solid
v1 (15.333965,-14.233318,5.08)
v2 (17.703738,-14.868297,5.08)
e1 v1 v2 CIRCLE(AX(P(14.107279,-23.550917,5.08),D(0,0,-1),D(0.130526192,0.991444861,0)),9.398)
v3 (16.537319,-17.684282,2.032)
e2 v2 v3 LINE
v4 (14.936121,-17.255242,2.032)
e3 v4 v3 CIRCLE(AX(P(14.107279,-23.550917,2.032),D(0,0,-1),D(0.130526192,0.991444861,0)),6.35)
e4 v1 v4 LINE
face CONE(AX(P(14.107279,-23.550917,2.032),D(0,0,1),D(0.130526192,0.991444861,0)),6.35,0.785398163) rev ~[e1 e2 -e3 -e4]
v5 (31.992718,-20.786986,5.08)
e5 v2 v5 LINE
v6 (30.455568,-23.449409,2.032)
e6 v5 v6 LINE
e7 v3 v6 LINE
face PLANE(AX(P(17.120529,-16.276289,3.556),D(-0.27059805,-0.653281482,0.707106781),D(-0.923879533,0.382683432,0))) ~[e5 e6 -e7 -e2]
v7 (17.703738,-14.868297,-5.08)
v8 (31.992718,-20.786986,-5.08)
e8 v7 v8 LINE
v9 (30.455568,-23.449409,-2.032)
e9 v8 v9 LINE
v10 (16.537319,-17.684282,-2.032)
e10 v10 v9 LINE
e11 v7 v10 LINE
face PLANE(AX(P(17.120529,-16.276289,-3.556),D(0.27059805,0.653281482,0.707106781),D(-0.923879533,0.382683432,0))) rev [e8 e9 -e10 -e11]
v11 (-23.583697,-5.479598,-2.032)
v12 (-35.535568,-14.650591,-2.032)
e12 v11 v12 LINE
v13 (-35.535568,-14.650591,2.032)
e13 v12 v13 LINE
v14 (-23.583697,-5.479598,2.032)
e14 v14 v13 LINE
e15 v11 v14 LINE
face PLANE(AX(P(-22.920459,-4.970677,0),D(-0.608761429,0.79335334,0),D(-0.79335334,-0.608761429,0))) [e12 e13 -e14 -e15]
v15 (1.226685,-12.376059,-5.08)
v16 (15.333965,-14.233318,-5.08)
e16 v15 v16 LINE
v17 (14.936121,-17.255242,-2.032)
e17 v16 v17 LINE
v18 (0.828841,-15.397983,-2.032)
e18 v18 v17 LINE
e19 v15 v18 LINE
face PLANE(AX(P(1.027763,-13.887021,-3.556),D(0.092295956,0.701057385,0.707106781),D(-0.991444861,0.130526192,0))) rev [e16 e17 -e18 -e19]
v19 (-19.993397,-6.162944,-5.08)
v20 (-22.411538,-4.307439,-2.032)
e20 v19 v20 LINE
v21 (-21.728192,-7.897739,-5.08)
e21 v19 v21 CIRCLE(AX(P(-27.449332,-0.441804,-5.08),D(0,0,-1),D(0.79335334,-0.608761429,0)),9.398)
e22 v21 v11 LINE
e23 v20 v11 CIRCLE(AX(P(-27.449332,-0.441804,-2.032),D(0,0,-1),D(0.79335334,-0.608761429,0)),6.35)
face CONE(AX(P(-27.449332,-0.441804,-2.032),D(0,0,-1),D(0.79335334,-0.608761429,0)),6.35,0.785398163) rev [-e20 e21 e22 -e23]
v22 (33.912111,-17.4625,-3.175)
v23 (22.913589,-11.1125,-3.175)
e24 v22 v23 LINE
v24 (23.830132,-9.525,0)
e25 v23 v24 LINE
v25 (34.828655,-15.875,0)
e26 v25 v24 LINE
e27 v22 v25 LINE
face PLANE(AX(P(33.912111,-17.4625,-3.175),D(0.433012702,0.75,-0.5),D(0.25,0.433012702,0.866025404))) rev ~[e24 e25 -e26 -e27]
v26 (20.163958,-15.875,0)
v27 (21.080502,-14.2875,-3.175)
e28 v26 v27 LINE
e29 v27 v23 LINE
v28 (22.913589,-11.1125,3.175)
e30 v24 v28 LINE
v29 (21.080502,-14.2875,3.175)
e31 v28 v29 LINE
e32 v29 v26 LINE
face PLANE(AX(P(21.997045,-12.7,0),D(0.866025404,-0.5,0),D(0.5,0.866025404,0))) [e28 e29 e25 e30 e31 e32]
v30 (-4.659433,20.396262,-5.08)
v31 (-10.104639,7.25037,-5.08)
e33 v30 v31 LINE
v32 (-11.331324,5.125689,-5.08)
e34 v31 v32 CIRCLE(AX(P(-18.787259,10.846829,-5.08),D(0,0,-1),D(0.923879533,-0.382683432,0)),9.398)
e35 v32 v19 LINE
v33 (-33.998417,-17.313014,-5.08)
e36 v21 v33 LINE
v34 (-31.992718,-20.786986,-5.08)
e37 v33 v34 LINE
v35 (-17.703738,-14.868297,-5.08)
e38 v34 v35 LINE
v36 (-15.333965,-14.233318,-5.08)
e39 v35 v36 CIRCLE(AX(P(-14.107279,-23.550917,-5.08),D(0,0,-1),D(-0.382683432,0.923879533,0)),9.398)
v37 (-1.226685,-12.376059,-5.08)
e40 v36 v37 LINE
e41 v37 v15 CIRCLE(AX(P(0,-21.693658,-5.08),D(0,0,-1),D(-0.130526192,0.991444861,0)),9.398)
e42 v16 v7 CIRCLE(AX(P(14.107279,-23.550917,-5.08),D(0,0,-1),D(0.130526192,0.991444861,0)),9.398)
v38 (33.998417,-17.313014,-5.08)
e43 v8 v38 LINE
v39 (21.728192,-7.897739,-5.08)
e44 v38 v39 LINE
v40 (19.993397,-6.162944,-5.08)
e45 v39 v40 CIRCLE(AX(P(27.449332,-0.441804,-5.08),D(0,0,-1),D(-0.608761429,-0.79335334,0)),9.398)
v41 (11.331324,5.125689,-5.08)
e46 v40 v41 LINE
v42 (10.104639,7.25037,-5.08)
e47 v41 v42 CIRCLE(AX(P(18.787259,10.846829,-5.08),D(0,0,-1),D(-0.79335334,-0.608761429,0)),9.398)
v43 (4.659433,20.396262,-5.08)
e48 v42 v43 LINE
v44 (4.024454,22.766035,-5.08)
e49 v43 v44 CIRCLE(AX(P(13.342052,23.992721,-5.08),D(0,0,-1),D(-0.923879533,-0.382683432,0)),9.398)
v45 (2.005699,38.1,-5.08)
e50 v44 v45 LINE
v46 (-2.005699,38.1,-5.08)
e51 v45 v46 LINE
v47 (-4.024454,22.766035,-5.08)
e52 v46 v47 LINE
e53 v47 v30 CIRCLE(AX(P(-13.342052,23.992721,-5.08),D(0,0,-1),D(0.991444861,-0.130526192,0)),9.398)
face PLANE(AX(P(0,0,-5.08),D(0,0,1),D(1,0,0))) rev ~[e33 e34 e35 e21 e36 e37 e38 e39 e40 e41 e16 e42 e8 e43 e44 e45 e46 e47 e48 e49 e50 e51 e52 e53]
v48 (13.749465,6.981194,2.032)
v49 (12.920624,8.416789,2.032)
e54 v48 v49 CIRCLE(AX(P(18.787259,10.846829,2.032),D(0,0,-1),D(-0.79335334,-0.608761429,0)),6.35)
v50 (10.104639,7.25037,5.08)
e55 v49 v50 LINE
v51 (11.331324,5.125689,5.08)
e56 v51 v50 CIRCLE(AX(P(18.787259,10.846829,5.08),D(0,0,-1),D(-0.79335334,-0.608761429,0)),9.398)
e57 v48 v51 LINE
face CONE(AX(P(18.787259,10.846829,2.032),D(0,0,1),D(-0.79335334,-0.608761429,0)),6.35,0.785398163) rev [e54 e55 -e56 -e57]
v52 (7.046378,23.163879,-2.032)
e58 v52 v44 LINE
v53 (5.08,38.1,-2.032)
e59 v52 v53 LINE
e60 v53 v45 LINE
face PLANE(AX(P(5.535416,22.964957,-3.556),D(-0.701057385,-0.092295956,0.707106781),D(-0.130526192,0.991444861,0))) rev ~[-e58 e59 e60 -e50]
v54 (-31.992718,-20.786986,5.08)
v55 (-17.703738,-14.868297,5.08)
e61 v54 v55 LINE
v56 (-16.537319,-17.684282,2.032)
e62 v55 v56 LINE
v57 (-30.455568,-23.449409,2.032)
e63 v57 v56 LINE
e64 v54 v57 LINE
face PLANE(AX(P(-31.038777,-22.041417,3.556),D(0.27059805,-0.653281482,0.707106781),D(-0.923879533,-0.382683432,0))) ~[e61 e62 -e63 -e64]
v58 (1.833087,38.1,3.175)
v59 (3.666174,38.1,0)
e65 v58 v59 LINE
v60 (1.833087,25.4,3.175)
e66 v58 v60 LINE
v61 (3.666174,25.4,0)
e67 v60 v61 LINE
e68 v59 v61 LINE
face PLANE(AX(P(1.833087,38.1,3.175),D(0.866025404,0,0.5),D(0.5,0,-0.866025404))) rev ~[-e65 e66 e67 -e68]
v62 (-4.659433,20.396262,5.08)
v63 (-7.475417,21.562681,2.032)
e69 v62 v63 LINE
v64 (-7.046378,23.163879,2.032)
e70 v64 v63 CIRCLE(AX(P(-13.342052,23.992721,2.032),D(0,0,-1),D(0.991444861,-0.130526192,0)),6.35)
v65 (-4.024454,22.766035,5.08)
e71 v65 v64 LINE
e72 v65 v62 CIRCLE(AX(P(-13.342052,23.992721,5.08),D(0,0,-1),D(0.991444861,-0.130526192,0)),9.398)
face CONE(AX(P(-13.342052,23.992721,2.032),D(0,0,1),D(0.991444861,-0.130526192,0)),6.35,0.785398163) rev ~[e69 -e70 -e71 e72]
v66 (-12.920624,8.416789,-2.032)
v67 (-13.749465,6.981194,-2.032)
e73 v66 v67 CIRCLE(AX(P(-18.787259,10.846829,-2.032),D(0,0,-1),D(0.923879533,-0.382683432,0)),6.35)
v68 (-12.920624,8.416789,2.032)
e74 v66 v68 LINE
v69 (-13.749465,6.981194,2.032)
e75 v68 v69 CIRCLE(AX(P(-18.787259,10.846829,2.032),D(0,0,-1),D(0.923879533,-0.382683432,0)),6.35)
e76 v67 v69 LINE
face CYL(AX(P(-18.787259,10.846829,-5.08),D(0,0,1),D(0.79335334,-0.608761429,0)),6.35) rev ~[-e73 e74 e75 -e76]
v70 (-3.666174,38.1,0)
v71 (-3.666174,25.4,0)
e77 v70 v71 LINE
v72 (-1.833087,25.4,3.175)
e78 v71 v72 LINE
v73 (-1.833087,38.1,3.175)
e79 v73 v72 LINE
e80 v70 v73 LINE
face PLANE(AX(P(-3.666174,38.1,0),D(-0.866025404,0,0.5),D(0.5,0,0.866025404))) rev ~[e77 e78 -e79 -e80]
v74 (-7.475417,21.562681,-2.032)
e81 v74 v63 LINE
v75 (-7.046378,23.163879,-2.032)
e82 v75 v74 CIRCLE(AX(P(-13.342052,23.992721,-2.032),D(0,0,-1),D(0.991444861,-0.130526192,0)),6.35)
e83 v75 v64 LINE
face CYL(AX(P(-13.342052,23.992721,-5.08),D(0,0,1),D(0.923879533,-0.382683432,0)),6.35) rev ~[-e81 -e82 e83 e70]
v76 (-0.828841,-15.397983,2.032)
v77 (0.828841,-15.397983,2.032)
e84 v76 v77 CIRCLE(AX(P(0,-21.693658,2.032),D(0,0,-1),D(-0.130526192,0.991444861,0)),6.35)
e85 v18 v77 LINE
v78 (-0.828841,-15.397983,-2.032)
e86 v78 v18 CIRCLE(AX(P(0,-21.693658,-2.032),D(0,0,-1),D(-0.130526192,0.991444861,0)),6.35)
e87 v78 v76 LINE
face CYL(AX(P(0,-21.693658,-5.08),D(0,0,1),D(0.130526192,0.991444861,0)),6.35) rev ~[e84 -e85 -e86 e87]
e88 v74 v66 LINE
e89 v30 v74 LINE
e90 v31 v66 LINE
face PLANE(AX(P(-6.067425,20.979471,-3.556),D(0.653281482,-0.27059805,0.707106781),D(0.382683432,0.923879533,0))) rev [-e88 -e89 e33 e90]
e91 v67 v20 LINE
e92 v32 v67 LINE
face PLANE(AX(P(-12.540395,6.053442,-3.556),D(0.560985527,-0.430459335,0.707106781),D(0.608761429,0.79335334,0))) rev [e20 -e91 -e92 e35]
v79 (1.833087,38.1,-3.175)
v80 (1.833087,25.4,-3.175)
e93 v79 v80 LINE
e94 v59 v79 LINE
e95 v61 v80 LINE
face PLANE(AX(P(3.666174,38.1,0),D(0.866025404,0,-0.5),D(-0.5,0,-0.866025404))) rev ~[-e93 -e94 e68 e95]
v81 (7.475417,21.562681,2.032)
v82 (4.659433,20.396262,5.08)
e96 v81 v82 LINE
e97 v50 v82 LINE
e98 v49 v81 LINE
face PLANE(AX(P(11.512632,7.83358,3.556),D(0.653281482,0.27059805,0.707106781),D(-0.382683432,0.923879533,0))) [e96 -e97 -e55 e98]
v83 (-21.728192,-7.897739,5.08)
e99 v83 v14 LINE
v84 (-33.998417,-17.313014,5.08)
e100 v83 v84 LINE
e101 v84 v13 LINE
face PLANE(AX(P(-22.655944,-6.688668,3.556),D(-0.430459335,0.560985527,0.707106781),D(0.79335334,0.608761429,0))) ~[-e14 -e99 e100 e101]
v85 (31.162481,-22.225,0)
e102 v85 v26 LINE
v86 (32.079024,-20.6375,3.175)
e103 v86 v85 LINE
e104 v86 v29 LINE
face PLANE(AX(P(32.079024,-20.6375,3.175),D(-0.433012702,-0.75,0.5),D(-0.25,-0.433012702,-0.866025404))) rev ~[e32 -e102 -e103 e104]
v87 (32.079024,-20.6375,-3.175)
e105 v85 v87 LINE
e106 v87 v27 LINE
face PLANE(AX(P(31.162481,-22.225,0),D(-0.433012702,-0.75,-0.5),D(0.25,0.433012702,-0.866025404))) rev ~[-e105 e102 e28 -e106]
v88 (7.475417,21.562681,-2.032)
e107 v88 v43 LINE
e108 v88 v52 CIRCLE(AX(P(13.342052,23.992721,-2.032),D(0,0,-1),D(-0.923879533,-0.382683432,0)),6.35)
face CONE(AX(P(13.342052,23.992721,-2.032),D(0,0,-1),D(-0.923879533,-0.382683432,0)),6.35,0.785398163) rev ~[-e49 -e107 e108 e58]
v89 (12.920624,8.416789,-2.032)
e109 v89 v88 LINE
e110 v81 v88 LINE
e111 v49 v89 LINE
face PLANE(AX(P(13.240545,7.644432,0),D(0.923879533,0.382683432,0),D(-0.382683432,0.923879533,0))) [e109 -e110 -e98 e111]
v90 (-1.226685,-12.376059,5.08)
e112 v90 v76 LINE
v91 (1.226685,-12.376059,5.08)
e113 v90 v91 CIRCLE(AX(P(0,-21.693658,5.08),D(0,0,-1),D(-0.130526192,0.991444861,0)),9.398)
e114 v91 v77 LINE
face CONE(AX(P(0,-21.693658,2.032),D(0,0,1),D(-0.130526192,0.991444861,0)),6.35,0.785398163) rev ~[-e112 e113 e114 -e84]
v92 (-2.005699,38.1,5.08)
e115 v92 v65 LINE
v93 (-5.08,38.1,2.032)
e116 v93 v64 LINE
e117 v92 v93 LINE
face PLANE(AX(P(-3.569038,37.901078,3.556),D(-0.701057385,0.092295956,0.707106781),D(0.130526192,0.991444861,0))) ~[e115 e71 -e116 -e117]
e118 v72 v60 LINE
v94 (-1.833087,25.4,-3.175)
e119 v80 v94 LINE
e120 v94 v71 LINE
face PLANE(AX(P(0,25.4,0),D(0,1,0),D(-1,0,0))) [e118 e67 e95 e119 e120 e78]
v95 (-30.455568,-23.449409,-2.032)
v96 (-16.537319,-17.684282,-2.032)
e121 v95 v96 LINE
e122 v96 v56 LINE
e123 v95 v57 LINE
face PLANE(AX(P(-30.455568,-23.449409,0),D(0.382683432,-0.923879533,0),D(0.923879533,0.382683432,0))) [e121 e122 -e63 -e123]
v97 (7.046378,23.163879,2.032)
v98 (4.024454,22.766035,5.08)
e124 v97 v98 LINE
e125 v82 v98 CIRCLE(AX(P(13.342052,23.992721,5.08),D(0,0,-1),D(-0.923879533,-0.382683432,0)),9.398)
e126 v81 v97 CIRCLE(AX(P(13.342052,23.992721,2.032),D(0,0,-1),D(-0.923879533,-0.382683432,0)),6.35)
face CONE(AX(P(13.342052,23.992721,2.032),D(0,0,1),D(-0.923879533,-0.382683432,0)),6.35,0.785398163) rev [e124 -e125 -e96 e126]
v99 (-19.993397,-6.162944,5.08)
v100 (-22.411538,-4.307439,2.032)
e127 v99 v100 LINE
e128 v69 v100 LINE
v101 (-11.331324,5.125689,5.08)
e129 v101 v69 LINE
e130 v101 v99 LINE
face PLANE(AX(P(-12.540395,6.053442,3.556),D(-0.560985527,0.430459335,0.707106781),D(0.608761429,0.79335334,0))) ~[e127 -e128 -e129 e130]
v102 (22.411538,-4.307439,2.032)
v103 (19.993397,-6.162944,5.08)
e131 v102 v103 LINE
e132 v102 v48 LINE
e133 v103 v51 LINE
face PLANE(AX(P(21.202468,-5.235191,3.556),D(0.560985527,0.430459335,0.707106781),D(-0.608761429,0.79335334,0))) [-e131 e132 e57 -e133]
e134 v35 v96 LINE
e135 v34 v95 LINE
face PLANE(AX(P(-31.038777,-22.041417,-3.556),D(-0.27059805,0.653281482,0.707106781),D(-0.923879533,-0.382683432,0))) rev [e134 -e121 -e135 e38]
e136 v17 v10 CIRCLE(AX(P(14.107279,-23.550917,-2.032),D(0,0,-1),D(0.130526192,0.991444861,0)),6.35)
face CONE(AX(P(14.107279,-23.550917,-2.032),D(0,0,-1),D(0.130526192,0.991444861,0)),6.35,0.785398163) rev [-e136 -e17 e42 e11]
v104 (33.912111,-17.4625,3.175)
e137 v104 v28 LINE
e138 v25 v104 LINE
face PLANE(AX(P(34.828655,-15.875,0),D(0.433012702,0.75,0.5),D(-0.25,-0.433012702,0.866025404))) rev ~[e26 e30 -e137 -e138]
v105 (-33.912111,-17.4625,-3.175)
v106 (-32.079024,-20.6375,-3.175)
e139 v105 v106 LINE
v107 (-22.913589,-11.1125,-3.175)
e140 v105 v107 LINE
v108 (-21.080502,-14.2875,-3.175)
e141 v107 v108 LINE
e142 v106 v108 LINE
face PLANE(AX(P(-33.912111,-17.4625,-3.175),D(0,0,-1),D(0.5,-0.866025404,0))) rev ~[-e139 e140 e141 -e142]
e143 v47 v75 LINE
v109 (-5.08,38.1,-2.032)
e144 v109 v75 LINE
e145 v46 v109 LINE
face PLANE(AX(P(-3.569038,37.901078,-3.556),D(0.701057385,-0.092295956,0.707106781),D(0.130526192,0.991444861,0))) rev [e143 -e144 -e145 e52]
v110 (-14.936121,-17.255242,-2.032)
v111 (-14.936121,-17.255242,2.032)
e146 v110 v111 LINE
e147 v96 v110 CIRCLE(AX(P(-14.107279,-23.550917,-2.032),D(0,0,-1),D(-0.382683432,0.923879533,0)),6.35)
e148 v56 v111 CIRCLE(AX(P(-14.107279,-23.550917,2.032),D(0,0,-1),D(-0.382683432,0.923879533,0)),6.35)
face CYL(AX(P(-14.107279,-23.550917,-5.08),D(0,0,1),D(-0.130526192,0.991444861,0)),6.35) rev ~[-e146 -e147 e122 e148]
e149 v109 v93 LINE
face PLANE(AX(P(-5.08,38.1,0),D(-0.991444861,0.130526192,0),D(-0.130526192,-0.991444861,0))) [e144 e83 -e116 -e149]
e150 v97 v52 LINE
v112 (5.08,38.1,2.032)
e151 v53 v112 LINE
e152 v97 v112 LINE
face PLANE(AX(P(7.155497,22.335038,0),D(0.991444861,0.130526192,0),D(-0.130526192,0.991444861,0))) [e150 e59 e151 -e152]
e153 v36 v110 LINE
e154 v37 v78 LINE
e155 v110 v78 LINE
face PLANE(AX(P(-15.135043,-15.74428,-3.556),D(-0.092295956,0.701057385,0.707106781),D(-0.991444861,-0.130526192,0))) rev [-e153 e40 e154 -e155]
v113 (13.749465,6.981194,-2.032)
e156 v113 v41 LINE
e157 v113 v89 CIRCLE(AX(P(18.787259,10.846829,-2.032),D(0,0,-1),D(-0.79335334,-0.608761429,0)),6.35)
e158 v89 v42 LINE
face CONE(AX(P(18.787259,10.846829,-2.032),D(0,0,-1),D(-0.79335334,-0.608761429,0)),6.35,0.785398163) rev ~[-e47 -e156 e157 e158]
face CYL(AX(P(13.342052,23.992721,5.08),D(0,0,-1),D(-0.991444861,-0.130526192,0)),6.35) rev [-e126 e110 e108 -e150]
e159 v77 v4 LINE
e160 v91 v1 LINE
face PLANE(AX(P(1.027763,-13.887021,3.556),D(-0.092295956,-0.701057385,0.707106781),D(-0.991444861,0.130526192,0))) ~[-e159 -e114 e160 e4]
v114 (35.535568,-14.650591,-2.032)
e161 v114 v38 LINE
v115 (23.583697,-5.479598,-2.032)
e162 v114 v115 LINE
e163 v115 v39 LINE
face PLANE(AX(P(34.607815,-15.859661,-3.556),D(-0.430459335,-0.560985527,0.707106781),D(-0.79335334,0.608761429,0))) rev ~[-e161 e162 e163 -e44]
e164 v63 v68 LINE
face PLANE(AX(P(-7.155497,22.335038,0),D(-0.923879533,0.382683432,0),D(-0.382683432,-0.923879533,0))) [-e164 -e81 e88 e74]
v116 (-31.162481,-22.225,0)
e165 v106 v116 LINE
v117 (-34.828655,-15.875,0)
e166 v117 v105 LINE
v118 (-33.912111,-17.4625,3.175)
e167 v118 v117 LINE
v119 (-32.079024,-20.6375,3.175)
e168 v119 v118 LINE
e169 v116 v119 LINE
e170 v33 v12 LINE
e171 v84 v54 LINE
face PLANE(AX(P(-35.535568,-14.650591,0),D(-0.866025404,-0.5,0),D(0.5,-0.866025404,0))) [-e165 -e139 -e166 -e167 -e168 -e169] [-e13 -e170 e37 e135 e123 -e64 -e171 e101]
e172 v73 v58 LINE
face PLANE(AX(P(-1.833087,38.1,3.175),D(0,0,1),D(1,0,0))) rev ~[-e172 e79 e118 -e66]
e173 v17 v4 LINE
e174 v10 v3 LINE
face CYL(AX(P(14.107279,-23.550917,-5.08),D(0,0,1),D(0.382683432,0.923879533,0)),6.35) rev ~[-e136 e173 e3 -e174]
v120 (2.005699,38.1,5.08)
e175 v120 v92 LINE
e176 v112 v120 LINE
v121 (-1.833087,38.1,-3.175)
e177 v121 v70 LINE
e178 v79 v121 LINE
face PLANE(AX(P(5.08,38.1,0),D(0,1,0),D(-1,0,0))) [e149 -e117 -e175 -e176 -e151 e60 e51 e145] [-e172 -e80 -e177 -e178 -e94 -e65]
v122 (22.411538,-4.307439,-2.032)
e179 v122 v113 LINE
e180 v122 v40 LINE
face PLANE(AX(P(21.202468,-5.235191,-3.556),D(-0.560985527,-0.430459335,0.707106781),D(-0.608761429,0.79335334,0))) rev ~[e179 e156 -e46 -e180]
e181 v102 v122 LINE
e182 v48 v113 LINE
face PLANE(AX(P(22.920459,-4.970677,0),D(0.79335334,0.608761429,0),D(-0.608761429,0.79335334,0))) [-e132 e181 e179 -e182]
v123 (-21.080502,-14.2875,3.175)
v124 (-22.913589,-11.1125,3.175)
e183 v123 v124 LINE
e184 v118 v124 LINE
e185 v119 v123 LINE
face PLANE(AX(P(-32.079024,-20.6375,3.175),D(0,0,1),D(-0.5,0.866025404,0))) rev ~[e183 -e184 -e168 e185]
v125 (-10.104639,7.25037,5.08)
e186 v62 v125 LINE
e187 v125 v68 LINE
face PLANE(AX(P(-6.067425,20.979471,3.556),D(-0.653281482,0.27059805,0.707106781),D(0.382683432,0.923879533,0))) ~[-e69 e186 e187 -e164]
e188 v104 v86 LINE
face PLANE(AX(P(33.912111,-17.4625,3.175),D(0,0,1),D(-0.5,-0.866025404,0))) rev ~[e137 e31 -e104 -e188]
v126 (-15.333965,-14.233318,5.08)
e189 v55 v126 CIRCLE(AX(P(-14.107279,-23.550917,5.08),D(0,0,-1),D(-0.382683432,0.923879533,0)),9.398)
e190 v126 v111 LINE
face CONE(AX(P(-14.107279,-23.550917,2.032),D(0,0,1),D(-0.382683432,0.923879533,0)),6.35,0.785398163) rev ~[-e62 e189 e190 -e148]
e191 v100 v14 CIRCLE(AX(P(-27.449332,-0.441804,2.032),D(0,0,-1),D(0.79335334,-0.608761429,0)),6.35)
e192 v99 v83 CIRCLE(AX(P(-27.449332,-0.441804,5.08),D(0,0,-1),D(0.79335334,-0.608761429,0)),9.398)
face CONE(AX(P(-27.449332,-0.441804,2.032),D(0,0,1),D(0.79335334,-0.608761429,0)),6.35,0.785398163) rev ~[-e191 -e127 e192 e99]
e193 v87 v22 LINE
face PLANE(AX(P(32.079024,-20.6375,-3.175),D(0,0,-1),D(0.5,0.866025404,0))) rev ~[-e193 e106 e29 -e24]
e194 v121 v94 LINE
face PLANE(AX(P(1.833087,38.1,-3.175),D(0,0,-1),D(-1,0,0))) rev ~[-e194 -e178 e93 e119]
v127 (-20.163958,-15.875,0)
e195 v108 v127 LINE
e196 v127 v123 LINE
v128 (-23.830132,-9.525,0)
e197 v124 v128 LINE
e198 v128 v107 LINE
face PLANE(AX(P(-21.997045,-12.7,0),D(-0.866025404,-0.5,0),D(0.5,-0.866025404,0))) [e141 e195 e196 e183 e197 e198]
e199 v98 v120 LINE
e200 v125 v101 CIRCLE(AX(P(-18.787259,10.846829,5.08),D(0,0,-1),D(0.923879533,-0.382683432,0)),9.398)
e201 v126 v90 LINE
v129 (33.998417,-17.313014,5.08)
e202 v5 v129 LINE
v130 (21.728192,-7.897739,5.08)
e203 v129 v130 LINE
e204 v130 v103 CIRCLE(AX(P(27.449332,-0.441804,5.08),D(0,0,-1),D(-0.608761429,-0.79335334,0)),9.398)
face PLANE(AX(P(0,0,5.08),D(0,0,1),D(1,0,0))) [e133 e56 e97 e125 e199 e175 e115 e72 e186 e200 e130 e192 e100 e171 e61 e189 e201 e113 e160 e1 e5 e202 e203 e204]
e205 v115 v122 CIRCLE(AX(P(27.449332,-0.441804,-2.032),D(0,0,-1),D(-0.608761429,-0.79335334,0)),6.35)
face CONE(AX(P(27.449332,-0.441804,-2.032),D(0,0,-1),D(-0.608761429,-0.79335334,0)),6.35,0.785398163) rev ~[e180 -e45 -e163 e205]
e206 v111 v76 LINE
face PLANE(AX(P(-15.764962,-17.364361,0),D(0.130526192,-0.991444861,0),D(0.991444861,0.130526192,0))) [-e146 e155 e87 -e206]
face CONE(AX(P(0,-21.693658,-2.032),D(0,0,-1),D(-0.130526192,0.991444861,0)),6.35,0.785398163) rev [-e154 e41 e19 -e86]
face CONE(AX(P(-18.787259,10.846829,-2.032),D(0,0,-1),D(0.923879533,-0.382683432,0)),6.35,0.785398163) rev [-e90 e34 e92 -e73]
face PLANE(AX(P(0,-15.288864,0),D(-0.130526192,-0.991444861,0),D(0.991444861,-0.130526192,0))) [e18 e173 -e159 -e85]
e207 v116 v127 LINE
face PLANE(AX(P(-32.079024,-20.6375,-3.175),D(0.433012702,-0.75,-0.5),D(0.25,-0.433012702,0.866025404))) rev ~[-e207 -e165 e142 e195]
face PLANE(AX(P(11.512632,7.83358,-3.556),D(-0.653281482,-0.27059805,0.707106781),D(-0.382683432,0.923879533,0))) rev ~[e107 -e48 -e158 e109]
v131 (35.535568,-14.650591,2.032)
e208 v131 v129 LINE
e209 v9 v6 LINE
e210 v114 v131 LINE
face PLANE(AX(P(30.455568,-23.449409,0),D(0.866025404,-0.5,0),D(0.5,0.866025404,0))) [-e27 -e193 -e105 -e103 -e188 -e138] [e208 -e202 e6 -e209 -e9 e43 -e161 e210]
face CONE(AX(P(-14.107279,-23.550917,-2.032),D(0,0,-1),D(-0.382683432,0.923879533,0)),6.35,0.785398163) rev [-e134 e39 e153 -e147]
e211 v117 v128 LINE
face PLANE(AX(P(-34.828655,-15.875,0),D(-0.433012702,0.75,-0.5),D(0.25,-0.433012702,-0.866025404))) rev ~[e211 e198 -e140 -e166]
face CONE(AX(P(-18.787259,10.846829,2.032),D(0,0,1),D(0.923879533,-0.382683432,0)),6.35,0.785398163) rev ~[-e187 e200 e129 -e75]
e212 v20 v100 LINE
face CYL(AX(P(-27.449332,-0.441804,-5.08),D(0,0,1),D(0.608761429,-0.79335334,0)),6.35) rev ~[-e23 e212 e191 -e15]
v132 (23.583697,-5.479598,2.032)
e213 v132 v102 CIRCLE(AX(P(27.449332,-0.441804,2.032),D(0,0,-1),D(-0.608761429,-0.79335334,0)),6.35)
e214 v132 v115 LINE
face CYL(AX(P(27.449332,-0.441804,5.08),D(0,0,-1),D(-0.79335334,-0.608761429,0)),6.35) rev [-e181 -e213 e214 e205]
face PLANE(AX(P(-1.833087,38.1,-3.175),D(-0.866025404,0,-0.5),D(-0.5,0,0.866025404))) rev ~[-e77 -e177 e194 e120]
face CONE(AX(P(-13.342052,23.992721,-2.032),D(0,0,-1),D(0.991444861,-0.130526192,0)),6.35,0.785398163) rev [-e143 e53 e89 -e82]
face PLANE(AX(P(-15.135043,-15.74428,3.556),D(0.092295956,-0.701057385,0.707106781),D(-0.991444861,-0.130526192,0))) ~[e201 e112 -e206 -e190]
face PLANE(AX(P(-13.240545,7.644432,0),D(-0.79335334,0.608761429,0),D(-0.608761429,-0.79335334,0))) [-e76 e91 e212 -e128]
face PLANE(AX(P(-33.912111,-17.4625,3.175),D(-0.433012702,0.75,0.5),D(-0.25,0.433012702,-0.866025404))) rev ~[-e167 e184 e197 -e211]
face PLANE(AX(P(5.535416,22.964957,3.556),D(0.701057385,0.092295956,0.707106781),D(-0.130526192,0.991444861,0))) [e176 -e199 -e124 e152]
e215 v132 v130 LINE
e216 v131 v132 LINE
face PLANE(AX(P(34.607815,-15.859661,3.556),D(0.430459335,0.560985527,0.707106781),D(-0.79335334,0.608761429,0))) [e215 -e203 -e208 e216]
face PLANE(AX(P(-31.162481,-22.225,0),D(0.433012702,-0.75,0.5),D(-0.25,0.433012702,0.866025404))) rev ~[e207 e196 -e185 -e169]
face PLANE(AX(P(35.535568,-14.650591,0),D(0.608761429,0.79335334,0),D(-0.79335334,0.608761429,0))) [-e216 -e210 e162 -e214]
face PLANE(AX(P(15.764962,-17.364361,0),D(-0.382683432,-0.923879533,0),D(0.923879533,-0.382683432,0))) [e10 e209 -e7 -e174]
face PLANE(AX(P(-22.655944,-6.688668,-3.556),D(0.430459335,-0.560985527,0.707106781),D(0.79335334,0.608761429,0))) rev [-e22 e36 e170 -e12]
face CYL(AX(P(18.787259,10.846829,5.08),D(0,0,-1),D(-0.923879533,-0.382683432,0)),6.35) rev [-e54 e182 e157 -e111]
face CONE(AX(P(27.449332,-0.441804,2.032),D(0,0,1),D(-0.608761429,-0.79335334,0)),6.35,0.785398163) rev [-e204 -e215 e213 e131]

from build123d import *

# Parameters (mm, degrees)
F3_DEPTH        = 5.08
F4_R            = 6.35
F5_SIZE         = 3.048
F7_DEPTH        = 12.7
F7_COPIES_COUNT = 3


# Not quite as in the source:
# - a pattern or mirror of a feature is missing from the dataset's text; its kind, count and spacing are read off the source's solid


with BuildPart() as f3:
    # F2 (on Top) → F3 (new body, symmetric)
    with BuildSketch(Plane.XY):
        Polygon((7.1554966211, 22.3350380043), (5.08, 38.1), (-5.08, 38.1), (-7.1554966211, 22.3350380043), (-13.2405448196, 7.6444321158), (-22.9204586168, -4.9706771516), (-35.5355678842, -14.6505909488), (-30.4555678842, -23.4494090512), (-15.7649619957, -17.3643608527), (0, -15.2888642316), (15.7649619957, -17.3643608527), (30.4555678842, -23.4494090512), (35.5355678842, -14.6505909488), (22.9204586168, -4.9706771516), (13.2405448196, 7.6444321158), align=None)
    extrude(amount=F3_DEPTH, both=True)

    # F4
    f4_edges = [f3.edges().sort_by_distance(p)[0] for p in [
        (-22.920459, -4.970677, 0),
        (-13.240545, 7.644432, 0),
        (7.155497, 22.335038, 0),
        (13.240545, 7.644432, 0),
        (-15.764962, -17.364361, 0),
        (0, -15.288864, 0),
        (22.920459, -4.970677, 0),
        (-7.155497, 22.335038, 0),
        (15.764962, -17.364361, 0),
    ]]
    fillet(f4_edges, radius=F4_R)

    # F5
    f5_edges = [f3.edges().sort_by_distance(p)[0] for p in [
        (-23.496444, -20.566845, 5.08),
        (-7.882481, -16.326613, 5.08),
        (7.882481, -16.326613, 5.08),
        (-29.559632, -10.065094, 5.08),
        (-18.080502, 1.336877, 5.08),
        (-10.198021, 14.989735, 5.08),
        (6.063189, 30.63194, 5.08),
        (10.198021, 14.989735, 5.08),
        (18.080502, 1.336877, 5.08),
        (-29.559632, -10.065094, -5.08),
        (-18.080502, 1.336877, -5.08),
        (-10.198021, 14.989735, -5.08),
        (6.063189, 30.63194, -5.08),
        (10.198021, 14.989735, -5.08),
        (18.080502, 1.336877, -5.08),
        (7.882481, -16.326613, -5.08),
        (-7.882481, -16.326613, -5.08),
        (-23.496444, -20.566845, -5.08),
        (-15.75078, -17.417288, -5.08),
        (0, -15.343658, -5.08),
        (15.75078, -17.417288, -5.08),
        (23.496444, -20.566845, -5.08),
        (-22.959204, -4.931932, -5.08),
        (29.559632, -10.065094, -5.08),
        (-13.287998, 7.671829, -5.08),
        (22.959204, -4.931932, -5.08),
        (-7.208423, 22.34922, -5.08),
        (13.287998, 7.671829, -5.08),
        (-6.063189, 30.63194, -5.08),
        (7.208423, 22.34922, -5.08),
        (-15.75078, -17.417288, 5.08),
        (0, -15.343658, 5.08),
        (15.75078, -17.417288, 5.08),
        (23.496444, -20.566845, 5.08),
        (-22.959204, -4.931932, 5.08),
        (29.559632, -10.065094, 5.08),
        (-13.287998, 7.671829, 5.08),
        (22.959204, -4.931932, 5.08),
        (-7.208423, 22.34922, 5.08),
        (13.287998, 7.671829, 5.08),
        (-6.063189, 30.63194, 5.08),
        (7.208423, 22.34922, 5.08),
    ]]
    chamfer(f5_edges, length=F5_SIZE)

    # F6 (on face) → F7 (cut)
    with BuildSketch(Plane(origin=(32.9955678842, -19.05, 0), x_dir=(0.5, 0.8660254038, 0), z_dir=(0.8660254038, -0.5, 0))):
        Polygon((-1.8330871047, 3.175), (-3.6661742094, 0), (-1.8330871047, -3.175), (1.8330871047, -3.175), (3.6661742094, 0), (1.8330871047, 3.175), align=None)
    f7 = extrude(amount=-F7_DEPTH, mode=Mode.SUBTRACT)

    # F7_copies: F7 ×3 about axis
    f7_copies_axis = Axis((0, 0, 0), (0, 0, 1))
    for i in range(1, F7_COPIES_COUNT):
        add(f7.rotate(f7_copies_axis, i * 360 / F7_COPIES_COUNT), mode=Mode.SUBTRACT)


solid = f3.part
